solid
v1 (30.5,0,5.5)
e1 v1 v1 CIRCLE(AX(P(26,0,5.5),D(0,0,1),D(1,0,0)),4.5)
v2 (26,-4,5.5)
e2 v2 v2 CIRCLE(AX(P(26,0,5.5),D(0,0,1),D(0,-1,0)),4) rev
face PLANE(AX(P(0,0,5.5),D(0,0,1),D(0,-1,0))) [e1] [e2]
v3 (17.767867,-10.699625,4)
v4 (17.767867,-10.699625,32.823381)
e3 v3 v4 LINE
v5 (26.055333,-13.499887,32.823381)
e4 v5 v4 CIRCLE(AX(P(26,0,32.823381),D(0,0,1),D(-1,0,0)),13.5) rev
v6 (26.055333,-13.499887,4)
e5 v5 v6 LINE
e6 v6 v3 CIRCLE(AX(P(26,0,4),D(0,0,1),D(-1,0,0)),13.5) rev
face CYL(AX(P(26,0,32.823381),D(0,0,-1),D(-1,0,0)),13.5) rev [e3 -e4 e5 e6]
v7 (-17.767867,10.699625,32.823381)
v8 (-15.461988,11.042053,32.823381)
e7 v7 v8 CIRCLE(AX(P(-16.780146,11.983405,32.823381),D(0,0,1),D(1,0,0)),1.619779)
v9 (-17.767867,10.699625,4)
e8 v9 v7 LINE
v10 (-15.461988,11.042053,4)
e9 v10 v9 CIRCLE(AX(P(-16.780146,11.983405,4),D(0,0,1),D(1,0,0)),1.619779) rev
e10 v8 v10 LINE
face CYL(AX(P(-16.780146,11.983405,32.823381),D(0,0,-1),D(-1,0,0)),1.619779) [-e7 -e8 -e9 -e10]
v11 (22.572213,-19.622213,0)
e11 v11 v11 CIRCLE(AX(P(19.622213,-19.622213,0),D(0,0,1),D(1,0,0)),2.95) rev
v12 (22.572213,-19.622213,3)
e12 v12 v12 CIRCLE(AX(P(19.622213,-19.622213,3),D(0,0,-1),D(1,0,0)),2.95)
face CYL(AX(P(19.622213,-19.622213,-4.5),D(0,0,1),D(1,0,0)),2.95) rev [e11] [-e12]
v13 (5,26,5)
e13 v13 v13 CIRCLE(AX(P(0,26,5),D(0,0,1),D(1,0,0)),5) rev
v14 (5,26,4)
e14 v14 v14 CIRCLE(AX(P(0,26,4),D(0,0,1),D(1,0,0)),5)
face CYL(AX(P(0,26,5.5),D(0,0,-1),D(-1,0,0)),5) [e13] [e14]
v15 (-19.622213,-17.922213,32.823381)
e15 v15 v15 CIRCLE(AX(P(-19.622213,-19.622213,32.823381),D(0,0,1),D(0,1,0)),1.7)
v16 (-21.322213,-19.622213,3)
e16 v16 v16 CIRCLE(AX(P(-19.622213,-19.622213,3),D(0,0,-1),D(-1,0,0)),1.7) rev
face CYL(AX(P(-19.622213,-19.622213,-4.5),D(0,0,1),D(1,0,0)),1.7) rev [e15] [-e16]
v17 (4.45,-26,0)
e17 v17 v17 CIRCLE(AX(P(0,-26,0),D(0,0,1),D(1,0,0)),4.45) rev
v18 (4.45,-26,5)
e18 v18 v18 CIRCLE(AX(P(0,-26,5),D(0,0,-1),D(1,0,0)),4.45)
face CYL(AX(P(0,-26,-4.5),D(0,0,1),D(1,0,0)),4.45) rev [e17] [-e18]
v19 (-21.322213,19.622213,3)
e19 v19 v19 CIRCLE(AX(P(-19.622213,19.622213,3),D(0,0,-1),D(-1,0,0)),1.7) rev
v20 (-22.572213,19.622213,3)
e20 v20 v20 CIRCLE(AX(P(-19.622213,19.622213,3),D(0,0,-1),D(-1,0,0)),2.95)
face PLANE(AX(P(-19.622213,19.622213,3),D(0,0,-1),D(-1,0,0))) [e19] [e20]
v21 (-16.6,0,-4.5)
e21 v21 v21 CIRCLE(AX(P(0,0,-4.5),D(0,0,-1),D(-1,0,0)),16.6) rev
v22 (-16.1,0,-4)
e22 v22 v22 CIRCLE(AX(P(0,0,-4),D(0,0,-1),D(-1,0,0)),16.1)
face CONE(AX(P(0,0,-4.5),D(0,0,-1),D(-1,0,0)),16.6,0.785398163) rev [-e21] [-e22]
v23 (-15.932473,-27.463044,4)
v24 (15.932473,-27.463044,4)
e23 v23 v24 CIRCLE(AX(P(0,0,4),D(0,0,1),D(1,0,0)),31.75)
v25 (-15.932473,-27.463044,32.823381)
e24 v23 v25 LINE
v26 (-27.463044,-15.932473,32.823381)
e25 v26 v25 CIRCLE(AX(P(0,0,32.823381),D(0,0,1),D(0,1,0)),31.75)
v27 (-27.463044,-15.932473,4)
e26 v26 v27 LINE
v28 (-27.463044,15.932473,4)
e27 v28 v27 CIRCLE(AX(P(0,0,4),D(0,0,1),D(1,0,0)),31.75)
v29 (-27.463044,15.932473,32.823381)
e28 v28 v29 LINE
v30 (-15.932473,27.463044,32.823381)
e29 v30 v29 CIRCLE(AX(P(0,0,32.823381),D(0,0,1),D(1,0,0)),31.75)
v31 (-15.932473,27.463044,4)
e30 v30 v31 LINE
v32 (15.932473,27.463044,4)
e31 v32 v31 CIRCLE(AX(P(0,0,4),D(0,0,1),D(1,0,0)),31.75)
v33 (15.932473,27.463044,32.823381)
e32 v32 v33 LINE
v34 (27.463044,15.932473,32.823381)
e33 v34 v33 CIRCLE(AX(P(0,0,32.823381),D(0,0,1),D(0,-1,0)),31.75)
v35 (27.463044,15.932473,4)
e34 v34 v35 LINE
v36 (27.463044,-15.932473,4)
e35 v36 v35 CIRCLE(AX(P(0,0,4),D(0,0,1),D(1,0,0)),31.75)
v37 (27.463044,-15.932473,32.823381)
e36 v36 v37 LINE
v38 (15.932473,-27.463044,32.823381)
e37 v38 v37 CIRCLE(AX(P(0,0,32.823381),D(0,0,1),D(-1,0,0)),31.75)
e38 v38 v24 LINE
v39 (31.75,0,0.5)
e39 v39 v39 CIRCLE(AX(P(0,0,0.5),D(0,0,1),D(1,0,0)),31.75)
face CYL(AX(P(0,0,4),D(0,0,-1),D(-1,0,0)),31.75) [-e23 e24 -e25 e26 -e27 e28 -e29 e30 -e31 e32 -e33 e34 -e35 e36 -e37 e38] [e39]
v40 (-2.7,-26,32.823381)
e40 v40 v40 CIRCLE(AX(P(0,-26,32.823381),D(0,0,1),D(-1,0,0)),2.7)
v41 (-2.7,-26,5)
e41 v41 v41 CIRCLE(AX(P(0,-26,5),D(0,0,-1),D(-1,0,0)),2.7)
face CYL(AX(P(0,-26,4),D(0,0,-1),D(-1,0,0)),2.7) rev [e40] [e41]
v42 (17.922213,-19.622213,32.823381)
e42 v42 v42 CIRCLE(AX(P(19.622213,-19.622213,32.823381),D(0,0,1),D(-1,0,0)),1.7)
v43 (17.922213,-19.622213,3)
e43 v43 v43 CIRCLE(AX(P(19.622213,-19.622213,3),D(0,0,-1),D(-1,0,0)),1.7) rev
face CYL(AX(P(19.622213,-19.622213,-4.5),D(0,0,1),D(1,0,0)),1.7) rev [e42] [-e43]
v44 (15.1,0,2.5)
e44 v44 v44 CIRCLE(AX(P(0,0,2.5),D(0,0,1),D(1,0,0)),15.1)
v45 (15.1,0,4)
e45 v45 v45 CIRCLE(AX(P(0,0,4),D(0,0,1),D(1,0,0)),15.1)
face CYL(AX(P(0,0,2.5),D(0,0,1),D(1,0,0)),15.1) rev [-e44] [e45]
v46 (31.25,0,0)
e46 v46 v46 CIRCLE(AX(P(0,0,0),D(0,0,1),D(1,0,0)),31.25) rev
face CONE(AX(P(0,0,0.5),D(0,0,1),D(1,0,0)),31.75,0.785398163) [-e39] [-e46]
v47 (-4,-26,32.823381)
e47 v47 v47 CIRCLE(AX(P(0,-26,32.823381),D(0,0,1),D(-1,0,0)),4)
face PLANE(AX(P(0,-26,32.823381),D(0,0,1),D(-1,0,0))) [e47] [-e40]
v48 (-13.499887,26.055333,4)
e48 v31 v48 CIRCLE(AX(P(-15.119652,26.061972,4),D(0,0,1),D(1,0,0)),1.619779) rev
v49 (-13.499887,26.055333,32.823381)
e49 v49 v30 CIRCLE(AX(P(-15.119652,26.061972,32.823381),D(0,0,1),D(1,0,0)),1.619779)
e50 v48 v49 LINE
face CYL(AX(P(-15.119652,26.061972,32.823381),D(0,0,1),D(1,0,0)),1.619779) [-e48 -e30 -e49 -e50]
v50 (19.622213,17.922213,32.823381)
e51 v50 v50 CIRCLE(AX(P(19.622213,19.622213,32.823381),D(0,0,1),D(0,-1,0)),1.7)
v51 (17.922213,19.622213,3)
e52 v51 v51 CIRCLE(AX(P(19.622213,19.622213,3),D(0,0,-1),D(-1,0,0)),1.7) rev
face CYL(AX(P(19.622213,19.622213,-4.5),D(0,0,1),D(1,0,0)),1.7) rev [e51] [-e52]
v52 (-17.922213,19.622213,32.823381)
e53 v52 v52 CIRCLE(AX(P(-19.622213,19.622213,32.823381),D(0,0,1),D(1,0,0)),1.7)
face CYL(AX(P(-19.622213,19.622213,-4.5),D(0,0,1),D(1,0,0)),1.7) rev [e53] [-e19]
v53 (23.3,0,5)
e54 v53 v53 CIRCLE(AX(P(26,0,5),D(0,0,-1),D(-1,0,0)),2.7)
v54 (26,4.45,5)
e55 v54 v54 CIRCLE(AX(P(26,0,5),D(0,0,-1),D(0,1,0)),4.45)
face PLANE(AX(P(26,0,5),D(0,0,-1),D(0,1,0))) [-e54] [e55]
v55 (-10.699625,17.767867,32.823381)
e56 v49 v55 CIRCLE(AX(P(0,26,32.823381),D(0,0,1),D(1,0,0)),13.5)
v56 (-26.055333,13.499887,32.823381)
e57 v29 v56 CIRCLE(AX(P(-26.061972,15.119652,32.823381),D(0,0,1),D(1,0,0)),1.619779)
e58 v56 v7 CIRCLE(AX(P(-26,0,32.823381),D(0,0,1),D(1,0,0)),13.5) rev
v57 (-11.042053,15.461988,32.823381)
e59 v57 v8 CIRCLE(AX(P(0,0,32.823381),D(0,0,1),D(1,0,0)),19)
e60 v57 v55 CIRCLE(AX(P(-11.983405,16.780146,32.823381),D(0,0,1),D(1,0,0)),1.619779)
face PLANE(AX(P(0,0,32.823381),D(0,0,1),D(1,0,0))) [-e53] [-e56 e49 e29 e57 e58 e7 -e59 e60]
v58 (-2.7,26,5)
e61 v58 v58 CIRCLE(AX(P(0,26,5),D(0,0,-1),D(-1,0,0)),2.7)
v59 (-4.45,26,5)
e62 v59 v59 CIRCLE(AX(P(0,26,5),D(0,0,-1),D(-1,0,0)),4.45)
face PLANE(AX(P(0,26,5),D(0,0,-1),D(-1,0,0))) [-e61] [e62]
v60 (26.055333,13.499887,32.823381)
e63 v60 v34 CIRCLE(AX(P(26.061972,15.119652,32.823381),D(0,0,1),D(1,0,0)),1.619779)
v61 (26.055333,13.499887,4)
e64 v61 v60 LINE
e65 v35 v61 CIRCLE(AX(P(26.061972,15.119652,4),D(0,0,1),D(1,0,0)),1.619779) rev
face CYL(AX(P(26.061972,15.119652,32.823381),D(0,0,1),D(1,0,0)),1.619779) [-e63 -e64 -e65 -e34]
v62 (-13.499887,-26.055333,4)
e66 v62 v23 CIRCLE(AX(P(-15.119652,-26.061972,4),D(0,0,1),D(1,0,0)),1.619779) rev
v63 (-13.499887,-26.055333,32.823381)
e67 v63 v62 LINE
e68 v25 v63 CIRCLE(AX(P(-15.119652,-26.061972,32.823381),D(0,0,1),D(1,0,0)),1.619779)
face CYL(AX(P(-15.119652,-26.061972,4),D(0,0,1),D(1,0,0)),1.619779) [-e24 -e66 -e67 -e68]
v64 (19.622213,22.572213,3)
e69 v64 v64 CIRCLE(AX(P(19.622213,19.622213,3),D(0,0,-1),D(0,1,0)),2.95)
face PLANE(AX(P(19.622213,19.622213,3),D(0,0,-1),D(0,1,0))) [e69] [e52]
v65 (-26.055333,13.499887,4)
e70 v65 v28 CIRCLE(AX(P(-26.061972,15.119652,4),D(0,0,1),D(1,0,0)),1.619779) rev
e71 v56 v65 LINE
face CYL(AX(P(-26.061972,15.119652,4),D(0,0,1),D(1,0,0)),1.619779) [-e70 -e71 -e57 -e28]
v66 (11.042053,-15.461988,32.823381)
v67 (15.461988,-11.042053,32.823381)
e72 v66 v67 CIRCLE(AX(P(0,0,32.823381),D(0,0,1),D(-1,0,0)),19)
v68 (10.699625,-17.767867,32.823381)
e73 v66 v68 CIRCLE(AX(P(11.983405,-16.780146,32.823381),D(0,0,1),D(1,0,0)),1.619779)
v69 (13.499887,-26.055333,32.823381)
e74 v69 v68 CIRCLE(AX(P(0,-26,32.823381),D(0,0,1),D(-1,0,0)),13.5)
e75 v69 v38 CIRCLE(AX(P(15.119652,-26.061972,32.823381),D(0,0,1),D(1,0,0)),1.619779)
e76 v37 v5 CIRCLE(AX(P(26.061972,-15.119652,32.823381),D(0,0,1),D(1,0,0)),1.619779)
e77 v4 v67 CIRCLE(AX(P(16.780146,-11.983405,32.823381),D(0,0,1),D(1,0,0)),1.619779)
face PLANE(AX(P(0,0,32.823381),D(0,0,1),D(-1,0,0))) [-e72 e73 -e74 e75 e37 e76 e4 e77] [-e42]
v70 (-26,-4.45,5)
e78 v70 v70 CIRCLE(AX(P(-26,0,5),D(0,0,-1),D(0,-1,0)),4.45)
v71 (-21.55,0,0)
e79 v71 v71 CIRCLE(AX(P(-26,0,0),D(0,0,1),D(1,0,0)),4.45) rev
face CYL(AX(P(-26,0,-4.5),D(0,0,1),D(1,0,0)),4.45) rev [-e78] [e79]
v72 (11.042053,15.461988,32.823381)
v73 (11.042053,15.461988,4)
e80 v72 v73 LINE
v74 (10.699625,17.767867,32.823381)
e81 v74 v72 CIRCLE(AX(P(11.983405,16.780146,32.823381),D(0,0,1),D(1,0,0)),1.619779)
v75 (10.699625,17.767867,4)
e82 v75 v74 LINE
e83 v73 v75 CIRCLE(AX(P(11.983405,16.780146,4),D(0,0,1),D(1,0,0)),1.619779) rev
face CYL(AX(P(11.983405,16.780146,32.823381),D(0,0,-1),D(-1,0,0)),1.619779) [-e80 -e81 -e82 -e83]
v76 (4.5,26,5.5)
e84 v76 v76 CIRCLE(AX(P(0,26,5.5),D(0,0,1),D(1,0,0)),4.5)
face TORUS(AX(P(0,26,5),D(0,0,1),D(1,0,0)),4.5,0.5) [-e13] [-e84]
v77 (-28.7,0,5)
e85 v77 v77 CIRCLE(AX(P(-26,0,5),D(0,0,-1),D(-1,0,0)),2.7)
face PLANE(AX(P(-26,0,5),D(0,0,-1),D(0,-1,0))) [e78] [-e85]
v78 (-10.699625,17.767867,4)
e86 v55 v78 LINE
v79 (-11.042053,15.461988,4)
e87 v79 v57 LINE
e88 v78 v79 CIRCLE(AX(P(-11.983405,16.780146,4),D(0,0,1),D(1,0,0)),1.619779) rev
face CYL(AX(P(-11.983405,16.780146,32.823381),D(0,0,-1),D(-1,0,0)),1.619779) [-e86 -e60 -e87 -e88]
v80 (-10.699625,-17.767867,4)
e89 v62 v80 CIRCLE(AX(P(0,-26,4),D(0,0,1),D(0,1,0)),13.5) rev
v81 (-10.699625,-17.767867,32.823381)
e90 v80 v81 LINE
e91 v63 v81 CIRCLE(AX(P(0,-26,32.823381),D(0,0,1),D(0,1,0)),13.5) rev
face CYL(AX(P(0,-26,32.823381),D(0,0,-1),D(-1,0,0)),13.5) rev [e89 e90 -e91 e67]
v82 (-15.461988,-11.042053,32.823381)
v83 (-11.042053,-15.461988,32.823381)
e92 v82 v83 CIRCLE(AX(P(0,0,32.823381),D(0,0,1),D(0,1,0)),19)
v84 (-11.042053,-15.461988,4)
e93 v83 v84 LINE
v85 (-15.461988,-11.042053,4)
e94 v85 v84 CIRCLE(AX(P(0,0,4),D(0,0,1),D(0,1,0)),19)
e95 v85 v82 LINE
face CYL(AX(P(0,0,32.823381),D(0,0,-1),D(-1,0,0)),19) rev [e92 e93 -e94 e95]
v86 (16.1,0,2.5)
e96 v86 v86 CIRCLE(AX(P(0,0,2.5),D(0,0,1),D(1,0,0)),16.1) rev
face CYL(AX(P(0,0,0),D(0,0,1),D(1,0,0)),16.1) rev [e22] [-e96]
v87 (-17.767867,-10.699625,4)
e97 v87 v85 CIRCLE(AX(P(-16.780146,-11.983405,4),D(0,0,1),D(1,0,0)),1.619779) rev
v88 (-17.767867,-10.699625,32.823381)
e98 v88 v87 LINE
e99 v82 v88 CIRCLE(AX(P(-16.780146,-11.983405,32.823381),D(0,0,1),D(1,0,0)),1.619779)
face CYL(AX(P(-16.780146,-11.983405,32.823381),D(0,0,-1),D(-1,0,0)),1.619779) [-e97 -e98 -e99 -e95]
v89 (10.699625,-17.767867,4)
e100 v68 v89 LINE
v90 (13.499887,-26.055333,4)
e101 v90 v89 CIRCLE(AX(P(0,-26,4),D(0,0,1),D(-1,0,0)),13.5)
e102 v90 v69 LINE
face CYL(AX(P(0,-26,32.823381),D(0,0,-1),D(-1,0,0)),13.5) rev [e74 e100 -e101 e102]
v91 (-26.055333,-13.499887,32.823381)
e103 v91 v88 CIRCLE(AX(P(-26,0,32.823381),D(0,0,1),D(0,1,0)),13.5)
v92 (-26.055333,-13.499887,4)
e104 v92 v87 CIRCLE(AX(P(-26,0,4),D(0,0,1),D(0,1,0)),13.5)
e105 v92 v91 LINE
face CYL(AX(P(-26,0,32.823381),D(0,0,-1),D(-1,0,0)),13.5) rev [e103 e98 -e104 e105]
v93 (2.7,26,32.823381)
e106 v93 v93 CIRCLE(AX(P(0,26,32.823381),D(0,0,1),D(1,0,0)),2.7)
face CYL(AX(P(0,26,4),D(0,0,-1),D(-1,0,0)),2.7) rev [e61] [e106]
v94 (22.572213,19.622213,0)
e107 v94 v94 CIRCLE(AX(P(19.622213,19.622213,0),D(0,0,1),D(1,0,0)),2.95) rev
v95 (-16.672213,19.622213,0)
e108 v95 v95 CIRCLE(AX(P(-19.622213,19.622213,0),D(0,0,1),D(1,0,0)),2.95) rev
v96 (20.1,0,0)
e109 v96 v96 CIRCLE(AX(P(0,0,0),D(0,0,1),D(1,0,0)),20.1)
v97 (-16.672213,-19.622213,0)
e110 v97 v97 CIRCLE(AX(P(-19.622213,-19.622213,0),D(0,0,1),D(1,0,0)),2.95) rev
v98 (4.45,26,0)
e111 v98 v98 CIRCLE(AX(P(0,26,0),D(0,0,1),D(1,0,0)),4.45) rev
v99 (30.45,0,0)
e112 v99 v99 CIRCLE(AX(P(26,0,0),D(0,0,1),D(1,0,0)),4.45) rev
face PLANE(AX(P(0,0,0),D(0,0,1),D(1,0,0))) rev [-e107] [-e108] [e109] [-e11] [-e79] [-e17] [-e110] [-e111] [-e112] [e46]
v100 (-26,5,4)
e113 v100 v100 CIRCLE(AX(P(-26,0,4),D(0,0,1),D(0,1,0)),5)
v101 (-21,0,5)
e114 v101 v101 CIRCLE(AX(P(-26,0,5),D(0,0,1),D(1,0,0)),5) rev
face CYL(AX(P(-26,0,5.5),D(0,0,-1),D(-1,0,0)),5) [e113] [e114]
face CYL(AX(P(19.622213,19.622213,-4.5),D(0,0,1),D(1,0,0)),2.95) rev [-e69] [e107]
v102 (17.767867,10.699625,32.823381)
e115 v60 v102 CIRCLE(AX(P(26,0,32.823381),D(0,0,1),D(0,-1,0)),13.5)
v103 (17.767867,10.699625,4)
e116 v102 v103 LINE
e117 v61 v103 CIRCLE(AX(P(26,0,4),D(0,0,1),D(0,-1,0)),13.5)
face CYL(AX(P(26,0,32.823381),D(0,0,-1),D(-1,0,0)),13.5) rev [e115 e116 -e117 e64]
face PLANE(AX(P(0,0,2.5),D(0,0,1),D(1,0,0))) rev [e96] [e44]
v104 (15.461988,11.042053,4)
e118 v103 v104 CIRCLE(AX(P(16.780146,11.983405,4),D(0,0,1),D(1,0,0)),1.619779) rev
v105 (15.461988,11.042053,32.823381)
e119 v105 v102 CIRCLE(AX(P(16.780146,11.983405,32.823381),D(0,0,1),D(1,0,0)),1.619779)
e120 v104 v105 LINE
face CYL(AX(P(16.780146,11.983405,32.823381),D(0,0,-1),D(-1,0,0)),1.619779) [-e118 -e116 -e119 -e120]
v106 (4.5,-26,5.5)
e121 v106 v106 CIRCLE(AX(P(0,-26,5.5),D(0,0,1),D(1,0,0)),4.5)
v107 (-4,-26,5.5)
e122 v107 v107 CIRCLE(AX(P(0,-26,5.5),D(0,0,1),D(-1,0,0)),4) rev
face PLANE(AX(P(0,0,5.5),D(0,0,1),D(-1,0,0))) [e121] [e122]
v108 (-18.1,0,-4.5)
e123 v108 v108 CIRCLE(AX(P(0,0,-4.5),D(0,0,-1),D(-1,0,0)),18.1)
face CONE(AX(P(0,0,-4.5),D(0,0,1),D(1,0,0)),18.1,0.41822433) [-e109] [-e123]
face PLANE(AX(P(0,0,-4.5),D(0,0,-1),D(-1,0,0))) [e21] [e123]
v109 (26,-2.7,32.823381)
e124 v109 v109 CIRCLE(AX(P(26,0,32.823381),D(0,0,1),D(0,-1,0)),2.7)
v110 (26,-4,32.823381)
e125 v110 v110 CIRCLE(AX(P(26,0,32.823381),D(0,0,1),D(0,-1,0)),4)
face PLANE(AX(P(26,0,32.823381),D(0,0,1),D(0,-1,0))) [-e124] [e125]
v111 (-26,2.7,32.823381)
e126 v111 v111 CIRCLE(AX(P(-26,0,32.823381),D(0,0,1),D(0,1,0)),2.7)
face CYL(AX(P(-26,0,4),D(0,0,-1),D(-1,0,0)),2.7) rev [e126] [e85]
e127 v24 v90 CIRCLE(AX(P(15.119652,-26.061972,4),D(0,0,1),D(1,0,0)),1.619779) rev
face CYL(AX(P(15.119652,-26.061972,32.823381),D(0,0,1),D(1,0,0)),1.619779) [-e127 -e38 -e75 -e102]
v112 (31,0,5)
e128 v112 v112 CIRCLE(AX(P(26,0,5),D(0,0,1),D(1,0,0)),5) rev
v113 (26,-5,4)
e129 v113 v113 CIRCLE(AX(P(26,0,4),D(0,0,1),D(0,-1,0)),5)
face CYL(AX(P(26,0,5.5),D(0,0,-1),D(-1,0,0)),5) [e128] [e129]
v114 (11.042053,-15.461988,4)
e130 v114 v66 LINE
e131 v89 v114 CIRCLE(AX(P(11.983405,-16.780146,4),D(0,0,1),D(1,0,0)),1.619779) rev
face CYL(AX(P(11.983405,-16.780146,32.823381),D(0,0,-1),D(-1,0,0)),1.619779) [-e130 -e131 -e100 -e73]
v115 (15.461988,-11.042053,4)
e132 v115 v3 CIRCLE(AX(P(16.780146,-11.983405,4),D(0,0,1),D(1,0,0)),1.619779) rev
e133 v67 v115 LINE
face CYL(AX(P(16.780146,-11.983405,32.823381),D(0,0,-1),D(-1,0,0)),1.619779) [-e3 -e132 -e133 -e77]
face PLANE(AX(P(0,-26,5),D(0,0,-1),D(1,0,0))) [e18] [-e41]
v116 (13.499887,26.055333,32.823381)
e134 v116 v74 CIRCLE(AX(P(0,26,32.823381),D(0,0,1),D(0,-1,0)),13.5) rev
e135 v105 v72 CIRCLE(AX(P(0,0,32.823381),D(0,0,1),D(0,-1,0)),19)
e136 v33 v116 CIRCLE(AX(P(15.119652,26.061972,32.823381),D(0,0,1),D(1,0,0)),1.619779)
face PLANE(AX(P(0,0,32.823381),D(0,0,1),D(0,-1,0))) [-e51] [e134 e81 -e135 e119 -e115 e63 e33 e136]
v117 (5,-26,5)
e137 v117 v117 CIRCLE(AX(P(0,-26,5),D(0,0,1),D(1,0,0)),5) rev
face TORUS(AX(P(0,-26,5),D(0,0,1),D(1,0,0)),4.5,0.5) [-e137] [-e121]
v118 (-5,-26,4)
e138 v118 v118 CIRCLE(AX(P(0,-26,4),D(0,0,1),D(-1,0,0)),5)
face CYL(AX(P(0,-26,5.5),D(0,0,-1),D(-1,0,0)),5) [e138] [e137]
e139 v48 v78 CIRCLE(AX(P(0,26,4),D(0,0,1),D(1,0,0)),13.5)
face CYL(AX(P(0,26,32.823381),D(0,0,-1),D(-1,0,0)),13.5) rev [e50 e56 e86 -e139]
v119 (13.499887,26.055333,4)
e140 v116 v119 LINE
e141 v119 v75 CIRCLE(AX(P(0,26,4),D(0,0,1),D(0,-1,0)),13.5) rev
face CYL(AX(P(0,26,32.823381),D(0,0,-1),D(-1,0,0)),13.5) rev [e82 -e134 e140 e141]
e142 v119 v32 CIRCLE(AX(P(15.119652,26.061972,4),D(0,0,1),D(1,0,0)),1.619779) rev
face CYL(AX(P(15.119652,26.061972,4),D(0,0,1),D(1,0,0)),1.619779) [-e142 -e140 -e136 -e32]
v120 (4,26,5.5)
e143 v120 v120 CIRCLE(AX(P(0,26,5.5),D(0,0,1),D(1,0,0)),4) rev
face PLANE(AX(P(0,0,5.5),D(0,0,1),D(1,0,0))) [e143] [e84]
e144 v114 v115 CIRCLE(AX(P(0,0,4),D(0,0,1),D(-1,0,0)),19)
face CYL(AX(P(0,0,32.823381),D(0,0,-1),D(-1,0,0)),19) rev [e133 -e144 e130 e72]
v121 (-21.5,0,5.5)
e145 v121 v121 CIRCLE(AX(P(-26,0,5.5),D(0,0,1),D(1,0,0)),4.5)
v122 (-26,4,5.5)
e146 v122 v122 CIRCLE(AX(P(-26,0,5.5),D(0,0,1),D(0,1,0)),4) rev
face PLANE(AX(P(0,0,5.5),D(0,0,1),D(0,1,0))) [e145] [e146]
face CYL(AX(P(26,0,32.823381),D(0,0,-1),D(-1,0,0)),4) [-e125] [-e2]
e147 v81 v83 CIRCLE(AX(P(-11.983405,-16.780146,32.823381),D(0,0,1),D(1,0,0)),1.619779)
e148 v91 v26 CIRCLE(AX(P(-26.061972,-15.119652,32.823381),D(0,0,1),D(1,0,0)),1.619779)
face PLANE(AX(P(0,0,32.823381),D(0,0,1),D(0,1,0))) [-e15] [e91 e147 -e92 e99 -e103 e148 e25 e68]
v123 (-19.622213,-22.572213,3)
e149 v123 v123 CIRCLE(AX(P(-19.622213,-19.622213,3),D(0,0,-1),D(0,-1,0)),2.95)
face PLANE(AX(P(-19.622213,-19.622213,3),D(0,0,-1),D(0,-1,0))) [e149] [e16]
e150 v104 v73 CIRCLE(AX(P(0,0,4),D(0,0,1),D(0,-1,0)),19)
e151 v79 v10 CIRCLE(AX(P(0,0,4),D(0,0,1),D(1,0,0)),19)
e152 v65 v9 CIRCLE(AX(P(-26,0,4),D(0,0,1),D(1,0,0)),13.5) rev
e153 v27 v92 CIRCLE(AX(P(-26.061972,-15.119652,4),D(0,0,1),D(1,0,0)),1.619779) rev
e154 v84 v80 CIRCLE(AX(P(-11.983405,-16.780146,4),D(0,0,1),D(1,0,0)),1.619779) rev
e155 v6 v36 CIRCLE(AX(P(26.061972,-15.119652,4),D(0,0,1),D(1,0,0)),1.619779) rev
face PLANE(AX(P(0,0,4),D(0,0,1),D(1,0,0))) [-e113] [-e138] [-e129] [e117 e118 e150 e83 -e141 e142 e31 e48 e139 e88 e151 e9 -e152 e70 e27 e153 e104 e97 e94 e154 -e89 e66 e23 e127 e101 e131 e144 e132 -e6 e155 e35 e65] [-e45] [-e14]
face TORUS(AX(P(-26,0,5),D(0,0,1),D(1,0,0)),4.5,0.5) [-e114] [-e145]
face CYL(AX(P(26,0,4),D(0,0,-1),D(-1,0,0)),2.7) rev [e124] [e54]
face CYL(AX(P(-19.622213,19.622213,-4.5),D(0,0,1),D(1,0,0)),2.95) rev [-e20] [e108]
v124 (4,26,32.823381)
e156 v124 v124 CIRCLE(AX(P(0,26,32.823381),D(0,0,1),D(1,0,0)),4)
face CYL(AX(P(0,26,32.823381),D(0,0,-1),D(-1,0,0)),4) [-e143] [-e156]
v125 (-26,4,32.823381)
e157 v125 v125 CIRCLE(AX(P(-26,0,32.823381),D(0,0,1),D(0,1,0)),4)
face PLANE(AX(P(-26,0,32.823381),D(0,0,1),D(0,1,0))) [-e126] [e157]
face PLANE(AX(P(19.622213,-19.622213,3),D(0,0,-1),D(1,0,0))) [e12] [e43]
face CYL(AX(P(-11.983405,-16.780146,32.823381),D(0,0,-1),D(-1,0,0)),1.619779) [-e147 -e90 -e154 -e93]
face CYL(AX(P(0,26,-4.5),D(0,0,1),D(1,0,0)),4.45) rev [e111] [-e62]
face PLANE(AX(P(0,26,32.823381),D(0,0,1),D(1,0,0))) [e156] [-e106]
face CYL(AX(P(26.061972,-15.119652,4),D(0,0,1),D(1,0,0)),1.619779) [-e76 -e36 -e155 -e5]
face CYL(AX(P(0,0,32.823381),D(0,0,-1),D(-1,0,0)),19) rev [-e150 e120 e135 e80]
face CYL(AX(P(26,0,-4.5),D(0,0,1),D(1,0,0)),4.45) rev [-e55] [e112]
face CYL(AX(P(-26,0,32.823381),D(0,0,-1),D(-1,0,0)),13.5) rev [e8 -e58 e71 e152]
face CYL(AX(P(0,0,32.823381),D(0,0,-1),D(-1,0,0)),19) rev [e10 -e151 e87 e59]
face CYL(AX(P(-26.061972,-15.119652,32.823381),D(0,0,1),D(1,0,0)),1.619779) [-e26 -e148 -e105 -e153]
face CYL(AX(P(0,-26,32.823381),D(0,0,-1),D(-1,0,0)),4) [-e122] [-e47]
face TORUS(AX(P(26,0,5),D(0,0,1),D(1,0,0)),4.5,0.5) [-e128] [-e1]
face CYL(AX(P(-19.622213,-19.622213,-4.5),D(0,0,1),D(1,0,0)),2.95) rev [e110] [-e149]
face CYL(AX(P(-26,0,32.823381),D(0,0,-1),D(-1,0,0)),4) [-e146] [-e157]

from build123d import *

# Parameters (mm, degrees)
SKETCH1_R               = 31.75
SKETCH1_R_2             = 2.7
SKETCH1_R_3             = 2.6999999999999793
SKETCH1_R_4             = 2.699999999999988
SKETCH1_R_5             = 2.7000000000000046
BOSS_EXTRUDE1_DEPTH     = 4
SKETCH2_R               = 4.000000000000011
SKETCH2_R_2             = 2.7
BOSS_EXTRUDE2_DEPTH     = 28.823381129999998
SKETCH3_R               = 5.000000000000011
SKETCH3_R_2             = 4.000000000000011
BOSS_EXTRUDE3_DEPTH     = 1.5
BOSS_EXTRUDE4_DEPTH     = 28.823381129999998
FILLET2_R               = 0.5
FILLET5_R               = 1.61977879287575
CIRPATTERN1_START       = 4
CIRPATTERN1_DEPTH       = 28.82338113
CHAMFER1_SIZE           = 0.5
SKETCH9_R               = 8
CUT_EXTRUDE4_DEPTH      = 54.35646463391214
BOSS_EXTRUDE7_START     = -6.5
SKETCH10_R              = 8
SKETCH10_R_2            = 6.500000000000002
BOSS_EXTRUDE7_DEPTH     = 6.5
CUT_EXTRUDE5_DEPTH      = 54.35646463391214
CUT_EXTRUDE5_DEPTH_BACK = 54.35646463391214
SKETCH14_R              = 16.1
SKETCH15_R              = 16.1
SKETCH15_R_2            = 15.1
BOSS_EXTRUDE8_DEPTH     = 1.5
SKETCH16_R              = 18.099999999999998
SKETCH16_R_2            = 16.1
BOSS_EXTRUDE9_DEPTH     = 4.5
CHAMFER3_SIZE2          = 4.5
CHAMFER3_SIZE           = 2
SKETCH5_R               = 1.6999999999999995
CUT_EXTRUDE1_DEPTH      = 59.38801068434546
CUT_EXTRUDE3_START      = -5
SKETCH7_R               = 4.45
CUT_EXTRUDE3_DEPTH      = 61.61923559408127
CUT_EXTRUDE2_START      = -3
SKETCH6_R               = 2.949999999999982
CUT_EXTRUDE2_DEPTH      = 59.61923559408127
CIRPATTERN2_COUNT       = 4
CHAMFER4_SIZE           = 0.5


# Read off the part's stored shape, not the designer's step: CirPattern1
with BuildPart() as part:
    # Sketch1 → Boss-Extrude1 (new body)
    with BuildSketch(Plane.XY):
        Circle(SKETCH1_R)
        with Locations((0, 26)):
            Circle(SKETCH1_R_2, mode=Mode.SUBTRACT)
        with Locations((26, 1.59e-15)):
            Circle(SKETCH1_R_3, mode=Mode.SUBTRACT)
        with Locations((3.18e-15, -26)):
            Circle(SKETCH1_R_4, mode=Mode.SUBTRACT)
        with Locations((-26, 1.59e-15)):
            Circle(SKETCH1_R_5, mode=Mode.SUBTRACT)
    extrude(amount=BOSS_EXTRUDE1_DEPTH)

    # Sketch2 → Boss-Extrude2 (add)
    with BuildSketch(Plane.XY.offset(4)):
        with Locations((0, 26)):
            Circle(SKETCH2_R)
        with Locations((0, 26)):
            Circle(SKETCH2_R_2, mode=Mode.SUBTRACT)
    extrude(amount=BOSS_EXTRUDE2_DEPTH)

    # Sketch3 → Boss-Extrude3 (add)
    with BuildSketch(Plane.XY.offset(4)):
        with Locations((0, 26)):
            Circle(SKETCH3_R)
        with Locations((0, 26)):
            Circle(SKETCH3_R_2, mode=Mode.SUBTRACT)
    extrude(amount=BOSS_EXTRUDE3_DEPTH)

    # Sketch4 → Boss-Extrude4 (add)
    with BuildSketch(Plane.XY.offset(4)):
        with BuildLine():
            ThreePointArc((-9.529354319679797, 16.437499999999996), (-12.951492793939106, 22.190953609032412), (-13.189002373040246, 28.881009615384613))
            ThreePointArc((-13.189002373040248, 28.881009615384617), (-22.45064030267292, 22.450640302672845), (-28.88100961538466, 13.189002373040152))
            ThreePointArc((-28.88100961538466, 13.18900237304014), (-22.19095360903246, 12.951492793939027), (-16.437500000000036, 9.529354319679738))
            ThreePointArc((-16.437500000000036, 9.529354319679735), (-13.435028842544424, 13.43502884254438), (-9.529354319679797, 16.4375))
        make_face()
    extrude(amount=BOSS_EXTRUDE4_DEPTH)

    # Fillet2
    fillet2_edges = [part.edges().sort_by_distance(p)[0] for p in [
        (-5.000000000000011, 26, 5.5),
    ]]
    fillet(fillet2_edges, radius=FILLET2_R)

    # Fillet5
    fillet5_edges = [part.edges().sort_by_distance(p)[0] for p in [
        (-13.189002373040246, 28.881009615384613, 18.411690565),
        (-28.881009615384663, 13.189002373040147, 18.411690565),
        (-16.437500000000036, 9.529354319679737, 18.411690565),
        (-9.529354319679797, 16.4375, 18.411690565),
    ]]
    fillet(fillet5_edges, radius=FILLET5_R)

    # CirPattern1 outline → CirPattern1 (add)
    with BuildSketch(Plane.XY.offset(CIRPATTERN1_START)):
        with BuildLine():
            ThreePointArc((-15.461987637, -11.042053175), (-16.542214144, -10.381196466), (-17.767866629, -10.699625235))
            ThreePointArc((-17.767866629, -10.699625235), (-21.67849749, -12.789629238), (-26.055332527, -13.499886604))
            ThreePointArc((-26.055332527, -13.499886604), (-27.463927582, -14.308354959), (-27.463044171, -15.932473282))
            ThreePointArc((-27.463044171, -15.932473282), (-22.450640303, -22.450640303), (-15.932473282, -27.463044171))
            ThreePointArc((-15.932473282, -27.463044171), (-14.308354959, -27.463927582), (-13.499886604, -26.055332527))
            ThreePointArc((-13.499886604, -26.055332527), (-12.789629238, -21.67849749), (-10.699625235, -17.767866629))
            ThreePointArc((-10.699625235, -17.767866629), (-10.381196466, -16.542214144), (-11.042053175, -15.461987637))
            ThreePointArc((-11.042053175, -15.461987637), (-13.435028843, -13.435028843), (-15.461987637, -11.042053175))
        make_face()
        with BuildLine():
            ThreePointArc((27.463044171, 15.932473282), (22.450640303, 22.450640303), (15.932473282, 27.463044171))
            ThreePointArc((15.932473282, 27.463044171), (14.308354959, 27.463927582), (13.499886604, 26.055332527))
            ThreePointArc((13.499886604, 26.055332527), (12.789629238, 21.67849749), (10.699625235, 17.767866629))
            ThreePointArc((10.699625235, 17.767866629), (10.381196466, 16.542214144), (11.042053175, 15.461987637))
            ThreePointArc((11.042053175, 15.461987637), (13.435028843, 13.435028843), (15.461987637, 11.042053175))
            ThreePointArc((15.461987637, 11.042053175), (16.542214144, 10.381196466), (17.767866629, 10.699625235))
            ThreePointArc((17.767866629, 10.699625235), (21.67849749, 12.789629238), (26.055332527, 13.499886604))
            ThreePointArc((26.055332527, 13.499886604), (27.463927582, 14.308354959), (27.463044171, 15.932473282))
        make_face()
        with BuildLine():
            ThreePointArc((13.499886604, -26.055332527), (14.308354959, -27.463927582), (15.932473282, -27.463044171))
            ThreePointArc((15.932473282, -27.463044171), (22.450640303, -22.450640303), (27.463044171, -15.932473282))
            ThreePointArc((27.463044171, -15.932473282), (27.463927582, -14.308354959), (26.055332527, -13.499886604))
            ThreePointArc((26.055332527, -13.499886604), (21.67849749, -12.789629238), (17.767866629, -10.699625235))
            ThreePointArc((17.767866629, -10.699625235), (16.542214144, -10.381196466), (15.461987637, -11.042053175))
            ThreePointArc((15.461987637, -11.042053175), (13.435028843, -13.435028843), (11.042053175, -15.461987637))
            ThreePointArc((11.042053175, -15.461987637), (10.381196466, -16.542214144), (10.699625235, -17.767866629))
            ThreePointArc((10.699625235, -17.767866629), (12.789629238, -21.67849749), (13.499886604, -26.055332527))
        make_face()
    extrude(amount=CIRPATTERN1_DEPTH)

    # CirPattern1 2 outline → CirPattern1 2 (revolve)
    with BuildSketch(Plane(origin=(-26, 0, 0), x_dir=(1, 0, 0), z_dir=(0, -1, 0))):
        with BuildLine():
            Line((4, 32.82338113), (2.7, 32.82338113))
            Line((2.7, 32.82338113), (2.7, 4))
            Line((2.7, 4), (5, 4))
            Line((5, 4), (5, 5))
            ThreePointArc((5, 5), (4.853553391, 5.353553391), (4.5, 5.5))
            Line((4.5, 5.5), (4, 5.5))
            Line((4, 5.5), (4, 32.82338113))
        make_face()
    revolve(axis=Axis((-26, 0, 0), (0, 0, 1)))

    # CirPattern1 3 outline → CirPattern1 3 (revolve)
    with BuildSketch(Plane.XZ.offset(26)):
        with BuildLine():
            Line((4, 32.82338113), (2.7, 32.82338113))
            Line((2.7, 32.82338113), (2.7, 4))
            Line((2.7, 4), (5, 4))
            Line((5, 4), (5, 5))
            ThreePointArc((5, 5), (4.853553391, 5.353553391), (4.5, 5.5))
            Line((4.5, 5.5), (4, 5.5))
            Line((4, 5.5), (4, 32.82338113))
        make_face()
    revolve(axis=Axis((0, -26, 0), (0, 0, 1)))

    # CirPattern1 4 outline → CirPattern1 4 (revolve)
    with BuildSketch(Plane(origin=(26, 0, 0), x_dir=(1, 0, 0), z_dir=(0, -1, 0))):
        with BuildLine():
            Line((4, 32.82338113), (2.7, 32.82338113))
            Line((2.7, 32.82338113), (2.7, 4))
            Line((2.7, 4), (5, 4))
            Line((5, 4), (5, 5))
            ThreePointArc((5, 5), (4.853553391, 5.353553391), (4.5, 5.5))
            Line((4.5, 5.5), (4, 5.5))
            Line((4, 5.5), (4, 32.82338113))
        make_face()
    revolve(axis=Axis((26, 0, 0), (0, 0, 1)))

    # Chamfer1
    chamfer1_edges = [part.edges().sort_by_distance(p)[0] for p in [
        (-31.75, 3.89e-15, 0),
    ]]
    chamfer(chamfer1_edges, length=CHAMFER1_SIZE)

    # Sketch9 → Cut-Extrude4 (cut, through all)
    with BuildSketch(Plane.XY.offset(4)):
        Circle(SKETCH9_R)
    extrude(amount=-CUT_EXTRUDE4_DEPTH, mode=Mode.SUBTRACT)

    # Sketch10 → Boss-Extrude7 (add)
    with BuildSketch(Plane(origin=(0, 0, 0), x_dir=(-1, 0, 0), z_dir=(0, 0, -1)).offset(BOSS_EXTRUDE7_START)):
        Circle(SKETCH10_R)
        Circle(SKETCH10_R_2, mode=Mode.SUBTRACT)
    extrude(amount=BOSS_EXTRUDE7_DEPTH)

    # Sketch14 → Cut-Extrude5 (cut, two sides: drawn at the far end of the back side and taken through both)
    with BuildSketch(Plane.XY.offset(4).offset(-CUT_EXTRUDE5_DEPTH_BACK)):
        Circle(SKETCH14_R)
    extrude(amount=CUT_EXTRUDE5_DEPTH + CUT_EXTRUDE5_DEPTH_BACK, mode=Mode.SUBTRACT)

    # Sketch15 → Boss-Extrude8 (add)
    with BuildSketch(Plane.XY.offset(4)):
        Circle(SKETCH15_R)
        Circle(SKETCH15_R_2, mode=Mode.SUBTRACT)
    extrude(amount=-BOSS_EXTRUDE8_DEPTH)

    # Sketch16 → Boss-Extrude9 (add)
    with BuildSketch(Plane(origin=(0, 0, 0), x_dir=(-1, 0, 0), z_dir=(0, 0, -1))):
        with Locations(Location((0, 0, 0), (0, 0, 180))):
            Circle(SKETCH16_R)
        with Locations(Location((0, 0, 0), (0, 0, 180))):
            Circle(SKETCH16_R_2, mode=Mode.SUBTRACT)
    extrude(amount=BOSS_EXTRUDE9_DEPTH)

    # Chamfer3
    chamfer3_edges = [part.edges().sort_by_distance(p)[0] for p in [
        (-18.099999999999998, -4.43e-15, 0),
    ]]
    chamfer3_side = [part.faces().sort_by_distance(p)[0] for p in [
        (-18.139999999999997, -4.44e-15, 0),
    ]]
    chamfer(chamfer3_edges, length=CHAMFER3_SIZE - 0.0001, length2=CHAMFER3_SIZE2 - 0.0001, reference=chamfer3_side[0])  # a hair under: the kernel refuses the full size

    # Sketch5 → Cut-Extrude1 (cut, through all)
    with BuildSketch(Plane.XY.offset(32.823381129999994)):
        with Locations((-19.622213177926728, 19.622213177926657)):
            Circle(SKETCH5_R)
    cut_extrude1 = extrude(amount=-CUT_EXTRUDE1_DEPTH, mode=Mode.SUBTRACT)

    # Sketch7 → Cut-Extrude3 (cut)
    with BuildSketch(Plane(origin=(0, 0, 0), x_dir=(-1, 0, 0), z_dir=(0, 0, -1)).offset(CUT_EXTRUDE3_START)):
        with Locations(Location((0, 26, 0), (0, 0, 180))):
            Circle(SKETCH7_R)
    cut_extrude3 = extrude(amount=CUT_EXTRUDE3_DEPTH, mode=Mode.SUBTRACT)

    # Sketch6 → Cut-Extrude2 (cut)
    with BuildSketch(Plane(origin=(0, 0, 0), x_dir=(-1, 0, 0), z_dir=(0, 0, -1)).offset(CUT_EXTRUDE2_START)):
        with Locations(Location((19.622213177926728, 19.622213177926657, 0), (0, 0, 180))):
            Circle(SKETCH6_R)
    cut_extrude2 = extrude(amount=CUT_EXTRUDE2_DEPTH, mode=Mode.SUBTRACT)

    # CirPattern2: Cut-Extrude1, Cut-Extrude3, Cut-Extrude2 ×4 about axis
    cirpattern2_axis = Axis((-3.768e-14, -2.255e-14, 0), (0, 0, 1))
    add([cut_extrude1.rotate(cirpattern2_axis, i * 360 / CIRPATTERN2_COUNT) for i in range(1, CIRPATTERN2_COUNT)], mode=Mode.SUBTRACT)
    add([cut_extrude3.rotate(cirpattern2_axis, i * 360 / CIRPATTERN2_COUNT) for i in range(1, CIRPATTERN2_COUNT)], mode=Mode.SUBTRACT)
    add([cut_extrude2.rotate(cirpattern2_axis, i * 360 / CIRPATTERN2_COUNT) for i in range(1, CIRPATTERN2_COUNT)], mode=Mode.SUBTRACT)

    # Chamfer4
    chamfer4_edges = [part.edges().sort_by_distance(p)[0] for p in [
        (-16.1, -3.94e-15, -4.5),
    ]]
    chamfer(chamfer4_edges, length=CHAMFER4_SIZE)


solid = part.part
